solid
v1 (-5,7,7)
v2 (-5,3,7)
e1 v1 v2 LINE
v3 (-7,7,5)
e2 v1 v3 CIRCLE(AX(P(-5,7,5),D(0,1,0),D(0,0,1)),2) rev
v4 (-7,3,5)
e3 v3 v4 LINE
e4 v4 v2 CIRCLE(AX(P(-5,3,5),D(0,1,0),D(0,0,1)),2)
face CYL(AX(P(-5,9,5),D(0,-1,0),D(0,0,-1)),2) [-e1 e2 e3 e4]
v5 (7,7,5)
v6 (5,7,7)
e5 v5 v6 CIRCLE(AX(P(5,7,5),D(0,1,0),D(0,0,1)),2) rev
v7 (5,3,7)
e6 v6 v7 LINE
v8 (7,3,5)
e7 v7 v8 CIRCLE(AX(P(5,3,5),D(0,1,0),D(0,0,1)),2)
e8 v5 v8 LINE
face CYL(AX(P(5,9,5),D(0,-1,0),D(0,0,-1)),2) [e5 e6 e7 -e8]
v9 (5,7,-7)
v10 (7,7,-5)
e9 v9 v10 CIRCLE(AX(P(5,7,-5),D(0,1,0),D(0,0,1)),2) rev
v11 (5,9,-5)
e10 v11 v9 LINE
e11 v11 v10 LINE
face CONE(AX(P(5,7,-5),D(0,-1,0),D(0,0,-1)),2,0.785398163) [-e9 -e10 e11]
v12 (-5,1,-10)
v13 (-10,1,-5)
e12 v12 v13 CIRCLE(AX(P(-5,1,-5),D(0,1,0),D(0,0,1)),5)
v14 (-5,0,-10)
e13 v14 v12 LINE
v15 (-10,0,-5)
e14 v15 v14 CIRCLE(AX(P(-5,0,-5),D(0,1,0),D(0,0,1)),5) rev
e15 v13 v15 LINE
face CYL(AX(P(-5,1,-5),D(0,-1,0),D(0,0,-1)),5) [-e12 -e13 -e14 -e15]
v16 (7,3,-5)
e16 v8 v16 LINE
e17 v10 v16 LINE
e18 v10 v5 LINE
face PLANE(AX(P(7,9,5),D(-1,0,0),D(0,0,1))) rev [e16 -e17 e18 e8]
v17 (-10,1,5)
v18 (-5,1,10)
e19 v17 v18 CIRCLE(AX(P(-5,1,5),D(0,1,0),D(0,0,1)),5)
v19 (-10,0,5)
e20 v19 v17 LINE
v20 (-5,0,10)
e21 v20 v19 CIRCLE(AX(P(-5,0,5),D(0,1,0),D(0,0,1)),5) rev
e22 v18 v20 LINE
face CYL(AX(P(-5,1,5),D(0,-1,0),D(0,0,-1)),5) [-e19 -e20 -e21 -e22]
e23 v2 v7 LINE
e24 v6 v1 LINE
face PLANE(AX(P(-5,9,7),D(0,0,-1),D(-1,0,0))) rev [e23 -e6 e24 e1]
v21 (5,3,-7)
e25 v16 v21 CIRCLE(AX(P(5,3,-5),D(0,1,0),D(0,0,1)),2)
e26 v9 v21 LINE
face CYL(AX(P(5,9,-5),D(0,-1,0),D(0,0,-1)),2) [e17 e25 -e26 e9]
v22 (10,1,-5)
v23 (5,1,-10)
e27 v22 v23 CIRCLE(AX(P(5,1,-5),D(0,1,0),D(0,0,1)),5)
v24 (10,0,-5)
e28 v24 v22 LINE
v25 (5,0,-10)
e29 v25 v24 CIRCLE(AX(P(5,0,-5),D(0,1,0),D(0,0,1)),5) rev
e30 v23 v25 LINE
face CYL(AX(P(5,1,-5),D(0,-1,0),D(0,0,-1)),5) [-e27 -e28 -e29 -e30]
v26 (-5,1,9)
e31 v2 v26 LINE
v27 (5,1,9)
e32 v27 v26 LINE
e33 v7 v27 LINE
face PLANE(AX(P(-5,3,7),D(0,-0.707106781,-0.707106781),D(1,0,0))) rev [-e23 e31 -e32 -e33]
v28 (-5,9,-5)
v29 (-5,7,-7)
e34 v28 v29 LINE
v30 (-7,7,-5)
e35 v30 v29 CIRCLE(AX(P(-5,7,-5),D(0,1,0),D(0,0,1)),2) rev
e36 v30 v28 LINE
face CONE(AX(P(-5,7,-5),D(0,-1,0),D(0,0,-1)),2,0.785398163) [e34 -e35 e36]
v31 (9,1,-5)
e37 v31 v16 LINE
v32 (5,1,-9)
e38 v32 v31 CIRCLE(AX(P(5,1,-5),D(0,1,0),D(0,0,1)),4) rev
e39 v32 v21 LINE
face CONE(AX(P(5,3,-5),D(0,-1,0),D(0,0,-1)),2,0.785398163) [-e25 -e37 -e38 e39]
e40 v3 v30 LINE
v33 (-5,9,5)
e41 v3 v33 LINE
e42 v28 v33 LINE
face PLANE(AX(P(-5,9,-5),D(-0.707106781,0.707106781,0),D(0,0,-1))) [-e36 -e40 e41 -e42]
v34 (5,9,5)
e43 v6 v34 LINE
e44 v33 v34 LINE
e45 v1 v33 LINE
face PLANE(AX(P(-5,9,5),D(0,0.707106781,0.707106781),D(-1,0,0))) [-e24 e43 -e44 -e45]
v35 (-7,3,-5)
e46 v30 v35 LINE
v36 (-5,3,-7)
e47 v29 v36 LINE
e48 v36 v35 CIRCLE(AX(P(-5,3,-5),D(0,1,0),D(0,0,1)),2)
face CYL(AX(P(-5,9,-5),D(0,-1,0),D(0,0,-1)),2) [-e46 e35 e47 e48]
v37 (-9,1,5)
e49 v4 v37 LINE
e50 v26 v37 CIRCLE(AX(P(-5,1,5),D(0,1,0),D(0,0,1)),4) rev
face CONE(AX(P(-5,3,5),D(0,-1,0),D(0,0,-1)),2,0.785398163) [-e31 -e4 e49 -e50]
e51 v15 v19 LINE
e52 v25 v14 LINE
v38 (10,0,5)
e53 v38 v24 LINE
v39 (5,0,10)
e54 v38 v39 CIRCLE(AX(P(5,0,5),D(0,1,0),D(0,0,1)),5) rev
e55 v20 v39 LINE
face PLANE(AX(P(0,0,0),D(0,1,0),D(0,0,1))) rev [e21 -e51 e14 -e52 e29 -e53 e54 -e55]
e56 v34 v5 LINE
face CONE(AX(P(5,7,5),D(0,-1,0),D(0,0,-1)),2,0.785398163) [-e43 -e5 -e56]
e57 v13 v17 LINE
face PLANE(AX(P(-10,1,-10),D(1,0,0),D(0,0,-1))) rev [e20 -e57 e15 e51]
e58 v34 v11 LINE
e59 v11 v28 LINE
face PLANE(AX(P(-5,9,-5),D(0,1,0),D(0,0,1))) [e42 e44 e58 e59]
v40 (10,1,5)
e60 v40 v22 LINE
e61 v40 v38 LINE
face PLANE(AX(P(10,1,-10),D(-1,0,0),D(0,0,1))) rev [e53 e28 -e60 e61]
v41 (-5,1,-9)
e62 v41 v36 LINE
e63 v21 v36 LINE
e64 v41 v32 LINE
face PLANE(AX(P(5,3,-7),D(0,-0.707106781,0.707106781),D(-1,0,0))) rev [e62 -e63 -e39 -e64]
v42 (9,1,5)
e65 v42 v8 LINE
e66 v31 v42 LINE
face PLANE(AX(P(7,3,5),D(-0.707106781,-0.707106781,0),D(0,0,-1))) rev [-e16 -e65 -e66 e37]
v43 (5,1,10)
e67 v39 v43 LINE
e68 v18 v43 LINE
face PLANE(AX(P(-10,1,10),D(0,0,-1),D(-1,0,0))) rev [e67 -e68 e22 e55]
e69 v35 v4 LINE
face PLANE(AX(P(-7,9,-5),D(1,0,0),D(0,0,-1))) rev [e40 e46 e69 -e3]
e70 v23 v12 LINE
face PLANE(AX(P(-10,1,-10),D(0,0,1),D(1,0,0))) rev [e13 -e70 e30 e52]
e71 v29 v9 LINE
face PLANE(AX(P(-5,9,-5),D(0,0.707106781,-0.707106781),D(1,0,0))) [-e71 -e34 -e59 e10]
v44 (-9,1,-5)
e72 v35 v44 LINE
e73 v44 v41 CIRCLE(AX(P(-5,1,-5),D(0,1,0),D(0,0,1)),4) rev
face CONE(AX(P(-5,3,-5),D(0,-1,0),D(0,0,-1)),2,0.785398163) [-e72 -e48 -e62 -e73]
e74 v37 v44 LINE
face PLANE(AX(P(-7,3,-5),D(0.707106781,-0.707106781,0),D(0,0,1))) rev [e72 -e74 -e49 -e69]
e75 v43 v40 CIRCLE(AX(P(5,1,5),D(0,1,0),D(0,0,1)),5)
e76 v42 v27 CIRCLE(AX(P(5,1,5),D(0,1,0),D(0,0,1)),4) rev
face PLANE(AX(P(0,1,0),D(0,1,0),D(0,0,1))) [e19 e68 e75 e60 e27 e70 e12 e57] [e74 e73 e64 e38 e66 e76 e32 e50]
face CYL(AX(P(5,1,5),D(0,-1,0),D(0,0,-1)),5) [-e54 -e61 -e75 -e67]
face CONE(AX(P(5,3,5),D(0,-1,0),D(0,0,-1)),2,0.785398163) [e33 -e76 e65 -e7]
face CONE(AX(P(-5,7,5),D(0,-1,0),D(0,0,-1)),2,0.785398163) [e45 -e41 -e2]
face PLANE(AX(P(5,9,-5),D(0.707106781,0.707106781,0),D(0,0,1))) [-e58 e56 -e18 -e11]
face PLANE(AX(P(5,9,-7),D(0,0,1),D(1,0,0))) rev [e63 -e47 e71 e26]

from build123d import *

# Parameters (mm, degrees)
SKETCH1_W           = 20
SKETCH1_H           = 20
BOSS_EXTRUDE1_DEPTH = 1
FILLET2_R           = 5
BOSS_EXTRUDE3_DEPTH = 8
CHAMFER1_SIZE       = 2
CHAMFER3_SIZE       = 2


with BuildPart() as part:
    # Sketch1 → Boss-Extrude1 (new body)
    with BuildSketch(Plane(origin=(0, 0, 0), x_dir=(1, 0, 0), z_dir=(0, 1, 0))):
        Rectangle(SKETCH1_W, SKETCH1_H)
    extrude(amount=BOSS_EXTRUDE1_DEPTH)

    # Fillet2
    fillet2_edges = [part.edges().sort_by_distance(p)[0] for p in [
        (10, 0.5, 10),
        (-10, 0.5, 10),
        (-10, 0.5, -10),
        (10, 0.5, -10),
    ]]
    fillet(fillet2_edges, radius=FILLET2_R)

    # Sketch3 → Boss-Extrude3 (add)
    with BuildSketch(Plane(origin=(0, 1, 0), x_dir=(1, 0, 0), z_dir=(0, 1, 0))):
        with BuildLine():
            Line((-7, 5), (-7, -5))
            ThreePointArc((-7, -5), (-6.414213562, -6.414213562), (-5, -7))
            Line((-5, -7), (5, -7))
            ThreePointArc((5, -7), (6.414213562, -6.414213562), (7, -5))
            Line((7, -5), (7, 5))
            ThreePointArc((7, 5), (6.414213562, 6.414213562), (5, 7))
            Line((5, 7), (-5, 7))
            ThreePointArc((-5, 7), (-6.414213562, 6.414213562), (-7, 5))
        make_face()
    extrude(amount=BOSS_EXTRUDE3_DEPTH)

    # Chamfer1
    chamfer1_edges = [part.edges().sort_by_distance(p)[0] for p in [
        (-6.414213562, 1, -6.414213562),
        (-7, 1, 0),
        (-6.414213562, 1, 6.414213562),
        (0, 1, 7),
        (6.414213562, 1, 6.414213562),
        (7, 1, 0),
        (6.414213562, 1, -6.414213562),
        (0, 1, -7),
    ]]
    chamfer(chamfer1_edges, length=CHAMFER1_SIZE)

    # Chamfer3
    chamfer3_edges = [part.edges().sort_by_distance(p)[0] for p in [
        (-6.414213562, 9, -6.414213562),
        (-7, 9, 0),
        (-6.414213562, 9, 6.414213562),
        (0, 9, 7),
        (6.414213562, 9, 6.414213562),
        (7, 9, 0),
        (6.414213562, 9, -6.414213562),
        (0, 9, -7),
    ]]
    chamfer(chamfer3_edges, length=CHAMFER3_SIZE - 0.0001)  # a hair under: the kernel refuses the full size


solid = part.part
